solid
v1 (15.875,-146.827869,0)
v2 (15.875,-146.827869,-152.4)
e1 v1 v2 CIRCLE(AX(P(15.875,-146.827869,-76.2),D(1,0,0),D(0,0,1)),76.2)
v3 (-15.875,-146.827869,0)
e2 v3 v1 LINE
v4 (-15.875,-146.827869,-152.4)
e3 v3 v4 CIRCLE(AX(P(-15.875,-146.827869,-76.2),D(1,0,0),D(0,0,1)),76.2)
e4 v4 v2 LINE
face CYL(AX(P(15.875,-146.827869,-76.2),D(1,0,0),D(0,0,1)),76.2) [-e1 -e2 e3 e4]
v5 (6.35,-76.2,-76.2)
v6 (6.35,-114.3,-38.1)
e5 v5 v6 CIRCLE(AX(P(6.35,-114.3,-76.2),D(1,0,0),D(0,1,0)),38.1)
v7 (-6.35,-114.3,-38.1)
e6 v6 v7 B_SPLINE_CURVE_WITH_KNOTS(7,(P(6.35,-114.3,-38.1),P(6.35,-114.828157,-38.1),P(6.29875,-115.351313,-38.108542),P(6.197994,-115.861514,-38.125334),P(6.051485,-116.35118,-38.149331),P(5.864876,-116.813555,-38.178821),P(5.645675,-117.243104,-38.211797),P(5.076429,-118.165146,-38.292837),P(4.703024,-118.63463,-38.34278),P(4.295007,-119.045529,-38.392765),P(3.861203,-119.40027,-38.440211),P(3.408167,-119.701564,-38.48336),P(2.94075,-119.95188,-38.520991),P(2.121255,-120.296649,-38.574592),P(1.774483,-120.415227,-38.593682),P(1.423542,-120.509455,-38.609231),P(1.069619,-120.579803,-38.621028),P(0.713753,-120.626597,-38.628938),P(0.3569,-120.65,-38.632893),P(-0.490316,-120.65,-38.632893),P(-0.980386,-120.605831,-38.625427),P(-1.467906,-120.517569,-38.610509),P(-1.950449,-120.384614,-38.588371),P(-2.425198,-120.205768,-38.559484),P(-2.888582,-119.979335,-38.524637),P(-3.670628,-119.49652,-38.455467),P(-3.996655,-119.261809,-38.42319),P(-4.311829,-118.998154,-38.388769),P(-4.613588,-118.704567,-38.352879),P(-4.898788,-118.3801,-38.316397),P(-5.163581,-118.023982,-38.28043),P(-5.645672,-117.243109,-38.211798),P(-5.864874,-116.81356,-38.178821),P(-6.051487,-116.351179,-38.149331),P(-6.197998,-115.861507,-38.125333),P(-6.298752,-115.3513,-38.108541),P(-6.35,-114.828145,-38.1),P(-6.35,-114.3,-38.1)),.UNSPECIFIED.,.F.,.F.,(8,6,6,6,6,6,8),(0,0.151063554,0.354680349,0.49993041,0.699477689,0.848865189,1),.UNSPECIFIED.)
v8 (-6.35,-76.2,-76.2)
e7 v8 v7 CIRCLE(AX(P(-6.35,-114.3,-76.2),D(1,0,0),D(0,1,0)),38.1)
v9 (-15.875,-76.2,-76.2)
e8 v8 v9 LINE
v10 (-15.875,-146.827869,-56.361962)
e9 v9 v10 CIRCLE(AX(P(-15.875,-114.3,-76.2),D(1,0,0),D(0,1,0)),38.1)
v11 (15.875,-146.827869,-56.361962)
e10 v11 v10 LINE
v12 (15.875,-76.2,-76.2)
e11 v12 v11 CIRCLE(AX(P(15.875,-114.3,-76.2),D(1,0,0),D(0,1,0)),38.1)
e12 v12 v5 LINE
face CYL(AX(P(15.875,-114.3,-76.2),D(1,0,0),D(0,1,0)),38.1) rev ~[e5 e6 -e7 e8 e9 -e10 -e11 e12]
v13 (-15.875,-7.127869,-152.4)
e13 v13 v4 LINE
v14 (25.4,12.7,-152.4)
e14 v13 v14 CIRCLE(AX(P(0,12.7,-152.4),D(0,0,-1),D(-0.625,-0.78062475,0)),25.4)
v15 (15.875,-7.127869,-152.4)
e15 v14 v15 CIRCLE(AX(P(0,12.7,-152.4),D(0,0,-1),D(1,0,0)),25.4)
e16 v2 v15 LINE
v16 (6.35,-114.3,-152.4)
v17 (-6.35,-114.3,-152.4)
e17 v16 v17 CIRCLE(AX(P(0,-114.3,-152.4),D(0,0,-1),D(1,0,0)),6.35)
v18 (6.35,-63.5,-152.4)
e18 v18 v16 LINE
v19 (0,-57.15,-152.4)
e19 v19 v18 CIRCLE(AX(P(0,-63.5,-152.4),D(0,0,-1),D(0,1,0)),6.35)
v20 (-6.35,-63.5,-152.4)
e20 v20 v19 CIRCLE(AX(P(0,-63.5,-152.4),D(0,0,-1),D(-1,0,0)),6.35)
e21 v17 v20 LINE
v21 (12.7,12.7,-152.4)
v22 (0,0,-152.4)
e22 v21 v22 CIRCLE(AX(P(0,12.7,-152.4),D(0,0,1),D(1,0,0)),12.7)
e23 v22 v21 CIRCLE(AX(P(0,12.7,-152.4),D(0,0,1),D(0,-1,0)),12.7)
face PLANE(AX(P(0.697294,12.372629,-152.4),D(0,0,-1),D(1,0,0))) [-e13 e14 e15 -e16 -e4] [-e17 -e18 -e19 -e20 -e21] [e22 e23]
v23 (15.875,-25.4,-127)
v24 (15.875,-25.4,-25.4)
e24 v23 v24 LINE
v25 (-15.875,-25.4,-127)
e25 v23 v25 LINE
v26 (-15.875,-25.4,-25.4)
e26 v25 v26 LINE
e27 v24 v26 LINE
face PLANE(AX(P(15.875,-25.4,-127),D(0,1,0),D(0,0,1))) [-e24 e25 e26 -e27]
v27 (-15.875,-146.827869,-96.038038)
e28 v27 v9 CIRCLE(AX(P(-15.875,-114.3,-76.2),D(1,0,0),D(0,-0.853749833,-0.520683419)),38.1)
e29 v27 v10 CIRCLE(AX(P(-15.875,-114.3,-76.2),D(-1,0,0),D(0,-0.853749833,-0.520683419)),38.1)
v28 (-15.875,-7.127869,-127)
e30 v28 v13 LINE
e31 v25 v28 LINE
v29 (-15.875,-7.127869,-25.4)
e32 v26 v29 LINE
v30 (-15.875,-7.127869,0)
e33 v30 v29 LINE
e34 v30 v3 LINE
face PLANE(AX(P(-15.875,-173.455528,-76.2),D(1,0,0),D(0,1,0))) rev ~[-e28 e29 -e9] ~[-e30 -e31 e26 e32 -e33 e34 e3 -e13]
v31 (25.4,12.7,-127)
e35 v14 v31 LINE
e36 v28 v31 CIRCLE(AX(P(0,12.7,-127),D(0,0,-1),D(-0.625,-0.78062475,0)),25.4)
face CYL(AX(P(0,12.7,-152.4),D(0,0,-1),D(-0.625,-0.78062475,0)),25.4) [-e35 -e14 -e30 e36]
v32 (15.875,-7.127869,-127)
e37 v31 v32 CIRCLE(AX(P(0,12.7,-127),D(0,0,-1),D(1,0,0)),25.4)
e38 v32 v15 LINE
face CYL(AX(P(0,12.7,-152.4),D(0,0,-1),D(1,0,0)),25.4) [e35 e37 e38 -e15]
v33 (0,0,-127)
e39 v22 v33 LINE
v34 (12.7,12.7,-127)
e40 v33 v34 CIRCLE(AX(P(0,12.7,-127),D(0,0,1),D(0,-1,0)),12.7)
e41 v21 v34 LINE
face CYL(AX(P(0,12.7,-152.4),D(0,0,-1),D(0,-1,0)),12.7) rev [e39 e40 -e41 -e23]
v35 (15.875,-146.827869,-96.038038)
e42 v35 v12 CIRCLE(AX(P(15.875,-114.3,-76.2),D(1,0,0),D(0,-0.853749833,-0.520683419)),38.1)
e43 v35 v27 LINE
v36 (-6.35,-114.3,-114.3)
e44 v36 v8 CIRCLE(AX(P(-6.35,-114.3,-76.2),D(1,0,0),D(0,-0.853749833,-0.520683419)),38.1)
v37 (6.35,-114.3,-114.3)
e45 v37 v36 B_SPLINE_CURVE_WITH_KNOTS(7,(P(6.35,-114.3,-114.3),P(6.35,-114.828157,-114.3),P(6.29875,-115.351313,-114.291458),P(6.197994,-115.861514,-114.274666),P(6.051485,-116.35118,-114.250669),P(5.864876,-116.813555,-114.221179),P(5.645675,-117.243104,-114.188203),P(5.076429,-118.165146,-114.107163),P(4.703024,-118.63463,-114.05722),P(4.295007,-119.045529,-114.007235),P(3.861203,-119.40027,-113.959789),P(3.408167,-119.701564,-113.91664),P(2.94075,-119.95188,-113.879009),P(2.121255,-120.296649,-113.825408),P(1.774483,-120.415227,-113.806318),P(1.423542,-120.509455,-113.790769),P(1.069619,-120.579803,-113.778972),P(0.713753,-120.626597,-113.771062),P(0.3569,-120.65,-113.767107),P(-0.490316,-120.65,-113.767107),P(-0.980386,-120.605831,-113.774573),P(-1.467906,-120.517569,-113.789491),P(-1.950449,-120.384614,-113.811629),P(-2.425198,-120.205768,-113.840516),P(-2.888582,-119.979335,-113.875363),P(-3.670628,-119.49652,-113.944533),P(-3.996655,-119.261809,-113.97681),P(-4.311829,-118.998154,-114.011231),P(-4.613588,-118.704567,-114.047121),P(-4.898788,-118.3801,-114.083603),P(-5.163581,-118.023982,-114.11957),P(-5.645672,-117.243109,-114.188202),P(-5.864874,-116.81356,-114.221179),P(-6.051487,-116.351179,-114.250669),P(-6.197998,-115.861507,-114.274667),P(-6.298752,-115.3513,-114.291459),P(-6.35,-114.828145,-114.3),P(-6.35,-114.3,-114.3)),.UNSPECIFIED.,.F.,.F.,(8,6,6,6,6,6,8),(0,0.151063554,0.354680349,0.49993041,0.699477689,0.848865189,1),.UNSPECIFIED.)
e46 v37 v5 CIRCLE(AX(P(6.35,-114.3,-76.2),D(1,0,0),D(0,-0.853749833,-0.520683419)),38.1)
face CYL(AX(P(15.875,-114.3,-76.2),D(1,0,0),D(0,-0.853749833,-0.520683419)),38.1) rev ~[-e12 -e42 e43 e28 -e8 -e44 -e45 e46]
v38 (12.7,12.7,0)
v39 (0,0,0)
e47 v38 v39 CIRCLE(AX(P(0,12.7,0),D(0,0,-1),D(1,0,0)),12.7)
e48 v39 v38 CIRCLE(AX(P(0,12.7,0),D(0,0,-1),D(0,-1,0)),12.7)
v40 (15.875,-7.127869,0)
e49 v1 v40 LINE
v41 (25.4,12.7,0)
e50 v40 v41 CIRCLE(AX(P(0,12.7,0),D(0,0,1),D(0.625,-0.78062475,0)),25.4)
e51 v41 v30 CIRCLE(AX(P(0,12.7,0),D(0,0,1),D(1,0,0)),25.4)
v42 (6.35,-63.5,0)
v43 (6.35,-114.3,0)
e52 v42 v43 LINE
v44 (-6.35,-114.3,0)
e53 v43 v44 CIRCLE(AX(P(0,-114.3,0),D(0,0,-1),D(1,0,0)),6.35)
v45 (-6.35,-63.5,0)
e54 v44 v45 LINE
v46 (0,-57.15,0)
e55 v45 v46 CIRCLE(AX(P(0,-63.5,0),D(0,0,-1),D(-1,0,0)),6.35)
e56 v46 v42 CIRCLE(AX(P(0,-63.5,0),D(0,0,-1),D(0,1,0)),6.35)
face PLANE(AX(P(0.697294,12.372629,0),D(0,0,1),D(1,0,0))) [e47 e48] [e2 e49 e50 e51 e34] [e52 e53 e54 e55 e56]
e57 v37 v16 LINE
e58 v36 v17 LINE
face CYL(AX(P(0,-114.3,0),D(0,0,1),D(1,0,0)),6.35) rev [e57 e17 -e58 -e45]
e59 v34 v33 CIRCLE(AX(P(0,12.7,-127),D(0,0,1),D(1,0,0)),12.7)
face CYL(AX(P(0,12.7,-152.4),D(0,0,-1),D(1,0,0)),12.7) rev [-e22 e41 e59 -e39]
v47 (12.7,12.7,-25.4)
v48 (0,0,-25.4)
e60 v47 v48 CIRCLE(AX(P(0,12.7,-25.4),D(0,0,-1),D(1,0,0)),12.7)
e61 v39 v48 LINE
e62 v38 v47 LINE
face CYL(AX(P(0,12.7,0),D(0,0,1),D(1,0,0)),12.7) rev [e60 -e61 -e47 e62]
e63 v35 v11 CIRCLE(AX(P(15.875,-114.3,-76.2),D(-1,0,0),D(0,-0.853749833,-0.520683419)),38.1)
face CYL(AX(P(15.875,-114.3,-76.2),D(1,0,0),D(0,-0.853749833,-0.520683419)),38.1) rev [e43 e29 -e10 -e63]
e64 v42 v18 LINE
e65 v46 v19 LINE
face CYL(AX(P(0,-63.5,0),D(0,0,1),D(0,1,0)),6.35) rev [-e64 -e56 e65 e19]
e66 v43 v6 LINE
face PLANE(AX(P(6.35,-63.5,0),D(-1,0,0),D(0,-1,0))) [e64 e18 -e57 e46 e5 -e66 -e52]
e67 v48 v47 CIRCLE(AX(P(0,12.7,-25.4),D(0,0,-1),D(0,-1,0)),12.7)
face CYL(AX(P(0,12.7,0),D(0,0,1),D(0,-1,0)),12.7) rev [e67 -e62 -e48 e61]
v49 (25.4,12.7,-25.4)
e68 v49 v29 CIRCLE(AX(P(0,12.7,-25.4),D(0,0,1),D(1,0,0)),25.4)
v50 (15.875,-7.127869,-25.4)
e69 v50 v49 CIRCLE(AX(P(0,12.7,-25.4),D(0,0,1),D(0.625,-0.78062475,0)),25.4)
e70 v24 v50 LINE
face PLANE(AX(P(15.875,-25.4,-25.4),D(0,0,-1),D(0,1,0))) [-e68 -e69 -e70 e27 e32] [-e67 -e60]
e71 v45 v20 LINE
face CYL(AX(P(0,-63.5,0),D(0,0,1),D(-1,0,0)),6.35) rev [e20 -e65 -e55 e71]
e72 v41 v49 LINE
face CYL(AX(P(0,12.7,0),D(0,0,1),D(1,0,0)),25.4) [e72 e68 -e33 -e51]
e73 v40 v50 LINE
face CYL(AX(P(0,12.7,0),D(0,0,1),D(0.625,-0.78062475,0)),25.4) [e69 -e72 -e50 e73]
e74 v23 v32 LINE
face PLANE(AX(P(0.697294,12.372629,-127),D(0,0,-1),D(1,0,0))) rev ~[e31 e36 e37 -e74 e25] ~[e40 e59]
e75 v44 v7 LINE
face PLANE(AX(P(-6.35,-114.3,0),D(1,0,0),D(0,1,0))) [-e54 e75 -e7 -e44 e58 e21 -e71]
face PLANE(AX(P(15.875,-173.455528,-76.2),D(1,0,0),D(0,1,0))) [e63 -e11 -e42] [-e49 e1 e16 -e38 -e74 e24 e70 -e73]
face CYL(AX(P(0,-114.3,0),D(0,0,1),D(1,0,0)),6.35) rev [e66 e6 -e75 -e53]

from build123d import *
from build123d import SkipClean  # not in build123d's __all__

# Parameters (mm, degrees)
F1_DEPTH = 152.4
F2_DEPTH = 25.4
F4_DEPTH = 31.75
F5_DEPTH = 41.276
F3_W     = 18.2721313551
F3_H     = 101.6
F6_DEPTH = 41.276
F8_DEPTH = 25.4


with BuildPart() as f1:
    # F0 (on Top) → F1 (new body)
    with BuildSketch(Plane.XY):
        with BuildLine():
            ThreePointArc((15.875, -7.1278686449), (8.4122570223, -11.266516889), (0, -12.7))
            ThreePointArc((0, -12.7), (-8.4122570223, -11.266516889), (-15.875, -7.1278686449))
            Line((-15.875, -7.1278686449), (-15.875, -146.8278686449))
            Line((-15.875, -146.8278686449), (15.875, -146.8278686449))
            Line((15.875, -146.8278686449), (15.875, -7.1278686449))
        make_face()
        with BuildLine():
            ThreePointArc((-6.35, -63.5), (-4.4901280605, -59.0098719395), (0, -57.15))
            ThreePointArc((0, -57.15), (4.4901280605, -59.0098719395), (6.35, -63.5))
            Line((6.35, -63.5), (6.35, -114.3))
            ThreePointArc((6.35, -114.3), (0, -120.65), (-6.35, -114.3))
            Line((-6.35, -114.3), (-6.35, -63.5))
        make_face(mode=Mode.SUBTRACT)
        with BuildLine():
            Line((15.875, -7.1278686449), (0, -7.1278686449))
            Line((0, -7.1278686449), (0, -12.7))
            ThreePointArc((0, -12.7), (8.4122570223, -11.266516889), (15.875, -7.1278686449))
        make_face()
        with BuildLine():
            Line((0, -12.7), (0, -7.1278686449))
            Line((0, -7.1278686449), (-15.875, -7.1278686449))
            ThreePointArc((-15.875, -7.1278686449), (-8.4122570223, -11.266516889), (0, -12.7))
        make_face()
    extrude(amount=-F1_DEPTH)

    # F0 (on Top) → F2 (join)
    with BuildSketch(Plane.XY):
        with BuildLine():
            Line((-15.875, -7.1278686449), (0, -7.1278686449))
            Line((0, -7.1278686449), (15.875, -7.1278686449))
            ThreePointArc((15.875, -7.1278686449), (22.8952505992, 1.7014773719), (25.4, 12.7))
            ThreePointArc((25.4, 12.7), (-10.9985226281, 35.5952505992), (-15.875, -7.1278686449))
        make_face()
        with BuildLine():
            ThreePointArc((12.7, 12.7), (8.9802561211, 3.7197438789), (0, 0))
            ThreePointArc((0, 0), (-8.9802561211, 21.6802561211), (12.7, 12.7))
        make_face(mode=Mode.SUBTRACT)
    extrude(amount=-F2_DEPTH)

    # F3 (on face) → F4 (join)
    with BuildSketch(Plane.YZ.offset(15.875)):
        with BuildLine():
            Line((-146.8278686449, -56.3619617548), (-146.8278686449, 0))
            ThreePointArc((-146.8278686449, 0), (-223.0278686449, -76.2), (-146.8278686449, -152.4))
            Line((-146.8278686449, -152.4), (-146.8278686449, -96.0380382452))
            ThreePointArc((-146.8278686449, -96.0380382452), (-152.4, -76.2), (-146.8278686449, -56.3619617548))
        make_face()
    extrude(amount=-F4_DEPTH)

    # F3 (on face) → F5 (cut, through all)
    with BuildSketch(Plane.YZ.offset(15.875)):
        with BuildLine():
            ThreePointArc((-76.2, -76.2), (-103.9971313551, -39.5194752261), (-146.8278686449, -56.3619617548))
            Line((-146.8278686449, -56.3619617548), (-146.8278686449, -96.0380382452))
            ThreePointArc((-146.8278686449, -96.0380382452), (-103.9971313551, -112.8805247739), (-76.2, -76.2))
        make_face()
    with SkipClean():  # cleaning this boolean's faces spoils the solid; the shape is the same uncleaned
        extrude(amount=-F5_DEPTH, mode=Mode.SUBTRACT)

    # F3 (on face) → F6 (cut, through all)
    with BuildSketch(Plane.YZ.offset(15.875)):
        with Locations((-16.2639343225, -76.2)):
            Rectangle(F3_W, F3_H)
    extrude(amount=-F6_DEPTH, mode=Mode.SUBTRACT)

    # F7 (on face) → F8 (join)
    with BuildSketch(Plane(origin=(0, 0, -152.4), x_dir=(1, 0, 0), z_dir=(0, 0, -1))):
        with BuildLine():
            ThreePointArc((-15.875, 7.1278686449), (-10.9985226281, -35.5952505992), (25.4, -12.7))
            ThreePointArc((25.4, -12.7), (22.8952505992, -1.7014773719), (15.875, 7.1278686449))
            Line((15.875, 7.1278686449), (-15.875, 7.1278686449))
        make_face()
        with BuildLine():
            ThreePointArc((0, 0), (8.9802561211, -3.7197438789), (12.7, -12.7))
            ThreePointArc((12.7, -12.7), (-8.9802561211, -21.6802561211), (0, 0))
        make_face(mode=Mode.SUBTRACT)
    extrude(amount=-F8_DEPTH)


solid = f1.part
